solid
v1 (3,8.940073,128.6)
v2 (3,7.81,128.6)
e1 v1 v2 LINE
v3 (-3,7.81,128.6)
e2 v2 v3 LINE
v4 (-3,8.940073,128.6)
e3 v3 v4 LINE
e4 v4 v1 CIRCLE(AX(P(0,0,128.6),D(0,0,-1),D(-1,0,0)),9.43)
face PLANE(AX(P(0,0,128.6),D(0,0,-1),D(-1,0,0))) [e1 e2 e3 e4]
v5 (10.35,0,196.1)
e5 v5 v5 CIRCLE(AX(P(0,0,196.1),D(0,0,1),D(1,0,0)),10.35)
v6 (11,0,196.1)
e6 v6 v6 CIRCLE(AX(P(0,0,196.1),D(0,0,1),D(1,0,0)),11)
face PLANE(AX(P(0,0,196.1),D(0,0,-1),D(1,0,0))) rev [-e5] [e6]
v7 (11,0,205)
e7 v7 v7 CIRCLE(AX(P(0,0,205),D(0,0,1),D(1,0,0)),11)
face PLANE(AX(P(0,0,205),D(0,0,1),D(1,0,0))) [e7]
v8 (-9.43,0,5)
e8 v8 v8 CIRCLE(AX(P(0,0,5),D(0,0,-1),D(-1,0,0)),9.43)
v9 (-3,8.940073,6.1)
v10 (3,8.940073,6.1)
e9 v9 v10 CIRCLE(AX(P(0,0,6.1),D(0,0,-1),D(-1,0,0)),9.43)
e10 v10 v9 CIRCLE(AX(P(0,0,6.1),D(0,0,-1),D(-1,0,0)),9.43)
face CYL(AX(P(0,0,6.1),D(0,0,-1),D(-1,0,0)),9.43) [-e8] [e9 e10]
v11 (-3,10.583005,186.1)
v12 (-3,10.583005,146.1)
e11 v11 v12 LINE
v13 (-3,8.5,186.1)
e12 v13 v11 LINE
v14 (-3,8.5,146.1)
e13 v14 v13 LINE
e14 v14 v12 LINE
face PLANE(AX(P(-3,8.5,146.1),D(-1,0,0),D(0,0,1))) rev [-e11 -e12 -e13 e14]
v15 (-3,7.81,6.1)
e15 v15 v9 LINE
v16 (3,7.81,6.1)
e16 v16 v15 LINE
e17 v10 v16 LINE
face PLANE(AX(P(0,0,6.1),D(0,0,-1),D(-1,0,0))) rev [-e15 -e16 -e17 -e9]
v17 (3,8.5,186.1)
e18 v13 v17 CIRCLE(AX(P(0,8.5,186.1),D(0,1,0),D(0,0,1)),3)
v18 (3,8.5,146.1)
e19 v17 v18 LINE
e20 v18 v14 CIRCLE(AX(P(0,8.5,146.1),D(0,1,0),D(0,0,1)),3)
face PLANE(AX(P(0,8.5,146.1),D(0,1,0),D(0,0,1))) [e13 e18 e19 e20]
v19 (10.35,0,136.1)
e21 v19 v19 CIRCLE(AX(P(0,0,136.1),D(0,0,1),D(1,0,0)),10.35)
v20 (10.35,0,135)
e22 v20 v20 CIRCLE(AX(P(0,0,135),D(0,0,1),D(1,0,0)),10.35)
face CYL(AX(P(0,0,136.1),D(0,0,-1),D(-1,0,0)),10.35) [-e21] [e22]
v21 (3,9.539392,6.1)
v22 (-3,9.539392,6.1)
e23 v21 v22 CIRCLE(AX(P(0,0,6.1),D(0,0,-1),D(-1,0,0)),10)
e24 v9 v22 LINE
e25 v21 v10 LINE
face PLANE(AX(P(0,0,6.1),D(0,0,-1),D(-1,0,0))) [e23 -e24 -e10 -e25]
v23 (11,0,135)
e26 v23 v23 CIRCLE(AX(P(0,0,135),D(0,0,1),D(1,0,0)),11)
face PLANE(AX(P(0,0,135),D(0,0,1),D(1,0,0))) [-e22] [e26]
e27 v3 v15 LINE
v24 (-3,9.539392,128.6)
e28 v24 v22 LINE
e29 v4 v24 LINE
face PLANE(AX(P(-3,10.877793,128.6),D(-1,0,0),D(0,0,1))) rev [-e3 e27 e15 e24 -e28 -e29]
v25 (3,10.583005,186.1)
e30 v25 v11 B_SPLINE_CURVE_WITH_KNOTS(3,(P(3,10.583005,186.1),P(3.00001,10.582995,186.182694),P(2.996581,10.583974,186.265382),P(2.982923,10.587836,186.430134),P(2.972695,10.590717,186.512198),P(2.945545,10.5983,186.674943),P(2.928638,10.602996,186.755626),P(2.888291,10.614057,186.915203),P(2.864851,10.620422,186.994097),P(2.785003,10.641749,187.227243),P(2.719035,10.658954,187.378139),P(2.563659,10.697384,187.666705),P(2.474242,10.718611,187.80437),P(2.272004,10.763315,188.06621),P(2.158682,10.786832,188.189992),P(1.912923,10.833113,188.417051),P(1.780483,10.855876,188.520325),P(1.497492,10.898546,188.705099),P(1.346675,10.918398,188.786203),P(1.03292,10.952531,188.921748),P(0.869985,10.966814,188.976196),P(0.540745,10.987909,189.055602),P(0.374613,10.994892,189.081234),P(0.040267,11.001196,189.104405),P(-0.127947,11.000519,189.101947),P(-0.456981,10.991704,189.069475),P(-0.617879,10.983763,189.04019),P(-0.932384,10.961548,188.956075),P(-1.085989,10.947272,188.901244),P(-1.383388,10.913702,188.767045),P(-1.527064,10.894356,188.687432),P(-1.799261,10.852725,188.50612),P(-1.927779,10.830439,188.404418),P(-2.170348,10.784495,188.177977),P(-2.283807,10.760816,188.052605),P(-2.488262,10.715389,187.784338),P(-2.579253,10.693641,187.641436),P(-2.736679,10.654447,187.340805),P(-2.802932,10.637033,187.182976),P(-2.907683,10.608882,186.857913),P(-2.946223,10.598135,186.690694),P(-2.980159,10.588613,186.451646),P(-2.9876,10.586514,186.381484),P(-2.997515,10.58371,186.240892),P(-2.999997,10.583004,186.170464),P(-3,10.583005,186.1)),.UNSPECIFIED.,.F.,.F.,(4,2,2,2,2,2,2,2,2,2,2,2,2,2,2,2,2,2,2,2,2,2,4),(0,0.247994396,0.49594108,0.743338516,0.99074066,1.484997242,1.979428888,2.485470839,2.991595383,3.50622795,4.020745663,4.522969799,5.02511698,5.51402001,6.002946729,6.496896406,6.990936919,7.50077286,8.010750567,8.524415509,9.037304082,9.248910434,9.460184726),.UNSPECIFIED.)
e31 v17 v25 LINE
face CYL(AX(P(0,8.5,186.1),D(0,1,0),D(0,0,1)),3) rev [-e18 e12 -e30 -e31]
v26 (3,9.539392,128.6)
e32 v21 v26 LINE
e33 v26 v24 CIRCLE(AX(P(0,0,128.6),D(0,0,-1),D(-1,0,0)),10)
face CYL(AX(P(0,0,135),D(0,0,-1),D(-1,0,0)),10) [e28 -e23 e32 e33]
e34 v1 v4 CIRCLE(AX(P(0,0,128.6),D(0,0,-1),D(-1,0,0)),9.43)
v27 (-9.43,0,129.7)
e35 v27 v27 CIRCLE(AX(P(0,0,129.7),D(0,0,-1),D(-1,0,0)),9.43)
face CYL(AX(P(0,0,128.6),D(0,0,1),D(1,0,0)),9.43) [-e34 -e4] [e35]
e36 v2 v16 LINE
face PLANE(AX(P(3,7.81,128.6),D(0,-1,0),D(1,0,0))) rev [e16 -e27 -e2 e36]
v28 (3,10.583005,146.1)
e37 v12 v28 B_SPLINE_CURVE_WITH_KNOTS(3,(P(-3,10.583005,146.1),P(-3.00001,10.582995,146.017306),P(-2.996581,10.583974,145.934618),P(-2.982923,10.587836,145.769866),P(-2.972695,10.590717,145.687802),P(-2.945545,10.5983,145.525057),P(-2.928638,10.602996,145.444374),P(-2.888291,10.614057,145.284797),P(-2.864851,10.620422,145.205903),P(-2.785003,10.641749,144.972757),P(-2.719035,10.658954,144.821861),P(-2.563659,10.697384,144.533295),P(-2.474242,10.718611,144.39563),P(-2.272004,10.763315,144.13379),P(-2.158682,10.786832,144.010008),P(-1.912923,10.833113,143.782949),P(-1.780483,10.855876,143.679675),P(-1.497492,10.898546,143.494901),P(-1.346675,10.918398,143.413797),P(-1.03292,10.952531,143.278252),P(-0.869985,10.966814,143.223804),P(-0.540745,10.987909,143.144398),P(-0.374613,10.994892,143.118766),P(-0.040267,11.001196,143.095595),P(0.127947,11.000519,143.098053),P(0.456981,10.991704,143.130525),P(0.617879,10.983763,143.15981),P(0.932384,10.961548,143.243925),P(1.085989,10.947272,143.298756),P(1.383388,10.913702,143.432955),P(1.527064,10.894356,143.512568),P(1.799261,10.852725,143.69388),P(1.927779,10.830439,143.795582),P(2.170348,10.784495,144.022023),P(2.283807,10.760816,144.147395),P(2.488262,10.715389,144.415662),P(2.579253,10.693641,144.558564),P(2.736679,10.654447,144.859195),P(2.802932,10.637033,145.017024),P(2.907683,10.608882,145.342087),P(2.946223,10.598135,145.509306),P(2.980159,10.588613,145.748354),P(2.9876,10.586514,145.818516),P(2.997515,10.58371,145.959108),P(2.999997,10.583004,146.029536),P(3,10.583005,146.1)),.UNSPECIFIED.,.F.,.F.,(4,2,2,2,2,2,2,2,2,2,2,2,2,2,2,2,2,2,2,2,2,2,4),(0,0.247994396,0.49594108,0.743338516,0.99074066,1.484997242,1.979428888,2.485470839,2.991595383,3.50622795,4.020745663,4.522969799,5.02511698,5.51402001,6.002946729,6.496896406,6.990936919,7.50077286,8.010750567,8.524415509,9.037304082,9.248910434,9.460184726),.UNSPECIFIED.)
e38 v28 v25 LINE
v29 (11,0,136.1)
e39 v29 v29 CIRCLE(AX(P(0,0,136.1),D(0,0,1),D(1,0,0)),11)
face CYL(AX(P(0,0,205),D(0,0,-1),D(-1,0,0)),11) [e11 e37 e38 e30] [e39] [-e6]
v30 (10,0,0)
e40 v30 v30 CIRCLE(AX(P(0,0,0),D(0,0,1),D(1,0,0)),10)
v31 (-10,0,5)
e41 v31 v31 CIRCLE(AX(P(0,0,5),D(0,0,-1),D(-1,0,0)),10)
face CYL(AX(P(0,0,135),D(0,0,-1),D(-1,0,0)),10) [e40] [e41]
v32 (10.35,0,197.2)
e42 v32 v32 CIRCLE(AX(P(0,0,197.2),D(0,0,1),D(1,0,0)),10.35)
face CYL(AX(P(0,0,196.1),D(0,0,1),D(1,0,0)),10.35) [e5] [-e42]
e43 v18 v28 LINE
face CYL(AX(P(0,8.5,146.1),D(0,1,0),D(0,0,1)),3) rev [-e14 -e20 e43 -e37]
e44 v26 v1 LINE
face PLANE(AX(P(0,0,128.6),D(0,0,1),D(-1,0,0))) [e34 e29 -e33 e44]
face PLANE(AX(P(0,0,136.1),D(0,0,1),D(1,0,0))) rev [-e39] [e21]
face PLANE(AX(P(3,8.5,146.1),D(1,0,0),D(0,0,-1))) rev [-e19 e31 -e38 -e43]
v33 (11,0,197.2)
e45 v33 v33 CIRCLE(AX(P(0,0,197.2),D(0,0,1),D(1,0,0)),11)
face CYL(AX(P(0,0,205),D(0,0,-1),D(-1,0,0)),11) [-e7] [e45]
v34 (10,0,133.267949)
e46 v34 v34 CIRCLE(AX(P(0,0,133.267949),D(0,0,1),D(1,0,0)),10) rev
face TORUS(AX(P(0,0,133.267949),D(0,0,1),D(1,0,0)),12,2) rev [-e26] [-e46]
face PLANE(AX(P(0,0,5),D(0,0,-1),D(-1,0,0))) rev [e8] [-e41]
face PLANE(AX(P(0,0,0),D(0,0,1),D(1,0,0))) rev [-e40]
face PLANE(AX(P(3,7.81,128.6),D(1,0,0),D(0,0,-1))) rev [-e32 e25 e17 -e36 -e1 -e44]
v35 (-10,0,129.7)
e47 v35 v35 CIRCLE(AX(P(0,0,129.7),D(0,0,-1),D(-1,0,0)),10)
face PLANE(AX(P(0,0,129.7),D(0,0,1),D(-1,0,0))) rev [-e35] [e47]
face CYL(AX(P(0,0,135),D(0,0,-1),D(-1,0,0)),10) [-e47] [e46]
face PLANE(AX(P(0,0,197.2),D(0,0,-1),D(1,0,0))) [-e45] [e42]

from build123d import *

# Parameters (mm, degrees)
SKETCH2_R           = 10
BOSS_EXTRUDE1_DEPTH = 135
SKETCH3_R           = 10
SKETCH3_R_2         = 9.43
CUT_EXTRUDE2_DEPTH  = 1.1
SKETCH4_W           = 6
SKETCH4_H           = 3.067792635
CUT_EXTRUDE3_DEPTH  = 61.25
SKETCH5_R           = 11
BOSS_EXTRUDE2_DEPTH = 70
FILLET3_R           = 2
SKETCH6_R           = 11
SKETCH6_R_2         = 10.35
CUT_EXTRUDE4_DEPTH  = 1.1
CUT_EXTRUDE5_DEPTH  = 2.5


with BuildPart() as part:
    # Sketch2 → Boss-Extrude1 (new body)
    with BuildSketch(Plane.XY):
        Circle(SKETCH2_R)
    extrude(amount=BOSS_EXTRUDE1_DEPTH)

    # Sketch3 → Cut-Extrude2 (cut)
    with BuildSketch(Plane(origin=(0, 0, 5), x_dir=(-1, 0, 0), z_dir=(0, 0, -1))):
        Circle(SKETCH3_R)
        Circle(SKETCH3_R_2, mode=Mode.SUBTRACT)
    cut_extrude2 = extrude(amount=-CUT_EXTRUDE2_DEPTH, mode=Mode.SUBTRACT)

    # Mirror1: Cut-Extrude2 across plane
    add(cut_extrude2.mirror(Plane(origin=(0, 0, 67.35), x_dir=(1, 0, 0), z_dir=(0, 0, -1))), mode=Mode.SUBTRACT)

    # Sketch4 → Cut-Extrude3 (cut, symmetric)
    with BuildSketch(Plane(origin=(0, 0, 67.35), x_dir=(-1, 0, 0), z_dir=(0, 0, -1))):
        with Locations((0, 9.343896318)):
            Rectangle(SKETCH4_W, SKETCH4_H)
    extrude(amount=CUT_EXTRUDE3_DEPTH, both=True, mode=Mode.SUBTRACT)

    # Sketch5 → Boss-Extrude2 (add)
    with BuildSketch(Plane.XY.offset(135)):
        Circle(SKETCH5_R)
    extrude(amount=BOSS_EXTRUDE2_DEPTH)

    # Fillet3
    # the kernel refuses this fillet: 2 mm, written as the material it adds along each edge
    with BuildSketch(Plane(origin=(0, 0, 135), x_dir=(1, 0, 0), z_dir=(0, -1, 0))) as fillet3_piece_1:
        with BuildLine():
            CenterArc((12, -1.732050808), FILLET3_R, 120, 60)
            Line((10, -1.732050808), (9.96, -1.732050808))
            Line((9.96, -1.732050808), (9.96, 0))
            Line((9.96, 0), (10, 0.04))
            ThreePointArc((10, 0.04), (10.5, 0.04), (10.98, 0.034641016))
            Line((10.98, 0.034641016), (11, 0))
        make_face()
    revolve(axis=Axis((0, 0, 135), (0, 0, 1)))

    # Sketch6 → Cut-Extrude4 (cut)
    with BuildSketch(Plane.XY.offset(135)):
        Circle(SKETCH6_R)
        Circle(SKETCH6_R_2, mode=Mode.SUBTRACT)
    cut_extrude4 = extrude(amount=CUT_EXTRUDE4_DEPTH, mode=Mode.SUBTRACT)

    # Mirror2: Cut-Extrude4 across plane
    add(cut_extrude4.mirror(Plane.XY.offset(166.1)), mode=Mode.SUBTRACT)

    # Sketch8 → Cut-Extrude5 (cut)
    with BuildSketch(Plane(origin=(0, 11, 0), x_dir=(1, 0, 0), z_dir=(0, 1, 0))):
        with BuildLine():
            Line((3, -146.1), (3, -186.1))
            ThreePointArc((3, -186.1), (0, -189.1), (-3, -186.1))
            Line((-3, -186.1), (-3, -146.1))
            ThreePointArc((-3, -146.1), (0, -143.1), (3, -146.1))
        make_face()
    extrude(amount=-CUT_EXTRUDE5_DEPTH, mode=Mode.SUBTRACT)


solid = part.part
